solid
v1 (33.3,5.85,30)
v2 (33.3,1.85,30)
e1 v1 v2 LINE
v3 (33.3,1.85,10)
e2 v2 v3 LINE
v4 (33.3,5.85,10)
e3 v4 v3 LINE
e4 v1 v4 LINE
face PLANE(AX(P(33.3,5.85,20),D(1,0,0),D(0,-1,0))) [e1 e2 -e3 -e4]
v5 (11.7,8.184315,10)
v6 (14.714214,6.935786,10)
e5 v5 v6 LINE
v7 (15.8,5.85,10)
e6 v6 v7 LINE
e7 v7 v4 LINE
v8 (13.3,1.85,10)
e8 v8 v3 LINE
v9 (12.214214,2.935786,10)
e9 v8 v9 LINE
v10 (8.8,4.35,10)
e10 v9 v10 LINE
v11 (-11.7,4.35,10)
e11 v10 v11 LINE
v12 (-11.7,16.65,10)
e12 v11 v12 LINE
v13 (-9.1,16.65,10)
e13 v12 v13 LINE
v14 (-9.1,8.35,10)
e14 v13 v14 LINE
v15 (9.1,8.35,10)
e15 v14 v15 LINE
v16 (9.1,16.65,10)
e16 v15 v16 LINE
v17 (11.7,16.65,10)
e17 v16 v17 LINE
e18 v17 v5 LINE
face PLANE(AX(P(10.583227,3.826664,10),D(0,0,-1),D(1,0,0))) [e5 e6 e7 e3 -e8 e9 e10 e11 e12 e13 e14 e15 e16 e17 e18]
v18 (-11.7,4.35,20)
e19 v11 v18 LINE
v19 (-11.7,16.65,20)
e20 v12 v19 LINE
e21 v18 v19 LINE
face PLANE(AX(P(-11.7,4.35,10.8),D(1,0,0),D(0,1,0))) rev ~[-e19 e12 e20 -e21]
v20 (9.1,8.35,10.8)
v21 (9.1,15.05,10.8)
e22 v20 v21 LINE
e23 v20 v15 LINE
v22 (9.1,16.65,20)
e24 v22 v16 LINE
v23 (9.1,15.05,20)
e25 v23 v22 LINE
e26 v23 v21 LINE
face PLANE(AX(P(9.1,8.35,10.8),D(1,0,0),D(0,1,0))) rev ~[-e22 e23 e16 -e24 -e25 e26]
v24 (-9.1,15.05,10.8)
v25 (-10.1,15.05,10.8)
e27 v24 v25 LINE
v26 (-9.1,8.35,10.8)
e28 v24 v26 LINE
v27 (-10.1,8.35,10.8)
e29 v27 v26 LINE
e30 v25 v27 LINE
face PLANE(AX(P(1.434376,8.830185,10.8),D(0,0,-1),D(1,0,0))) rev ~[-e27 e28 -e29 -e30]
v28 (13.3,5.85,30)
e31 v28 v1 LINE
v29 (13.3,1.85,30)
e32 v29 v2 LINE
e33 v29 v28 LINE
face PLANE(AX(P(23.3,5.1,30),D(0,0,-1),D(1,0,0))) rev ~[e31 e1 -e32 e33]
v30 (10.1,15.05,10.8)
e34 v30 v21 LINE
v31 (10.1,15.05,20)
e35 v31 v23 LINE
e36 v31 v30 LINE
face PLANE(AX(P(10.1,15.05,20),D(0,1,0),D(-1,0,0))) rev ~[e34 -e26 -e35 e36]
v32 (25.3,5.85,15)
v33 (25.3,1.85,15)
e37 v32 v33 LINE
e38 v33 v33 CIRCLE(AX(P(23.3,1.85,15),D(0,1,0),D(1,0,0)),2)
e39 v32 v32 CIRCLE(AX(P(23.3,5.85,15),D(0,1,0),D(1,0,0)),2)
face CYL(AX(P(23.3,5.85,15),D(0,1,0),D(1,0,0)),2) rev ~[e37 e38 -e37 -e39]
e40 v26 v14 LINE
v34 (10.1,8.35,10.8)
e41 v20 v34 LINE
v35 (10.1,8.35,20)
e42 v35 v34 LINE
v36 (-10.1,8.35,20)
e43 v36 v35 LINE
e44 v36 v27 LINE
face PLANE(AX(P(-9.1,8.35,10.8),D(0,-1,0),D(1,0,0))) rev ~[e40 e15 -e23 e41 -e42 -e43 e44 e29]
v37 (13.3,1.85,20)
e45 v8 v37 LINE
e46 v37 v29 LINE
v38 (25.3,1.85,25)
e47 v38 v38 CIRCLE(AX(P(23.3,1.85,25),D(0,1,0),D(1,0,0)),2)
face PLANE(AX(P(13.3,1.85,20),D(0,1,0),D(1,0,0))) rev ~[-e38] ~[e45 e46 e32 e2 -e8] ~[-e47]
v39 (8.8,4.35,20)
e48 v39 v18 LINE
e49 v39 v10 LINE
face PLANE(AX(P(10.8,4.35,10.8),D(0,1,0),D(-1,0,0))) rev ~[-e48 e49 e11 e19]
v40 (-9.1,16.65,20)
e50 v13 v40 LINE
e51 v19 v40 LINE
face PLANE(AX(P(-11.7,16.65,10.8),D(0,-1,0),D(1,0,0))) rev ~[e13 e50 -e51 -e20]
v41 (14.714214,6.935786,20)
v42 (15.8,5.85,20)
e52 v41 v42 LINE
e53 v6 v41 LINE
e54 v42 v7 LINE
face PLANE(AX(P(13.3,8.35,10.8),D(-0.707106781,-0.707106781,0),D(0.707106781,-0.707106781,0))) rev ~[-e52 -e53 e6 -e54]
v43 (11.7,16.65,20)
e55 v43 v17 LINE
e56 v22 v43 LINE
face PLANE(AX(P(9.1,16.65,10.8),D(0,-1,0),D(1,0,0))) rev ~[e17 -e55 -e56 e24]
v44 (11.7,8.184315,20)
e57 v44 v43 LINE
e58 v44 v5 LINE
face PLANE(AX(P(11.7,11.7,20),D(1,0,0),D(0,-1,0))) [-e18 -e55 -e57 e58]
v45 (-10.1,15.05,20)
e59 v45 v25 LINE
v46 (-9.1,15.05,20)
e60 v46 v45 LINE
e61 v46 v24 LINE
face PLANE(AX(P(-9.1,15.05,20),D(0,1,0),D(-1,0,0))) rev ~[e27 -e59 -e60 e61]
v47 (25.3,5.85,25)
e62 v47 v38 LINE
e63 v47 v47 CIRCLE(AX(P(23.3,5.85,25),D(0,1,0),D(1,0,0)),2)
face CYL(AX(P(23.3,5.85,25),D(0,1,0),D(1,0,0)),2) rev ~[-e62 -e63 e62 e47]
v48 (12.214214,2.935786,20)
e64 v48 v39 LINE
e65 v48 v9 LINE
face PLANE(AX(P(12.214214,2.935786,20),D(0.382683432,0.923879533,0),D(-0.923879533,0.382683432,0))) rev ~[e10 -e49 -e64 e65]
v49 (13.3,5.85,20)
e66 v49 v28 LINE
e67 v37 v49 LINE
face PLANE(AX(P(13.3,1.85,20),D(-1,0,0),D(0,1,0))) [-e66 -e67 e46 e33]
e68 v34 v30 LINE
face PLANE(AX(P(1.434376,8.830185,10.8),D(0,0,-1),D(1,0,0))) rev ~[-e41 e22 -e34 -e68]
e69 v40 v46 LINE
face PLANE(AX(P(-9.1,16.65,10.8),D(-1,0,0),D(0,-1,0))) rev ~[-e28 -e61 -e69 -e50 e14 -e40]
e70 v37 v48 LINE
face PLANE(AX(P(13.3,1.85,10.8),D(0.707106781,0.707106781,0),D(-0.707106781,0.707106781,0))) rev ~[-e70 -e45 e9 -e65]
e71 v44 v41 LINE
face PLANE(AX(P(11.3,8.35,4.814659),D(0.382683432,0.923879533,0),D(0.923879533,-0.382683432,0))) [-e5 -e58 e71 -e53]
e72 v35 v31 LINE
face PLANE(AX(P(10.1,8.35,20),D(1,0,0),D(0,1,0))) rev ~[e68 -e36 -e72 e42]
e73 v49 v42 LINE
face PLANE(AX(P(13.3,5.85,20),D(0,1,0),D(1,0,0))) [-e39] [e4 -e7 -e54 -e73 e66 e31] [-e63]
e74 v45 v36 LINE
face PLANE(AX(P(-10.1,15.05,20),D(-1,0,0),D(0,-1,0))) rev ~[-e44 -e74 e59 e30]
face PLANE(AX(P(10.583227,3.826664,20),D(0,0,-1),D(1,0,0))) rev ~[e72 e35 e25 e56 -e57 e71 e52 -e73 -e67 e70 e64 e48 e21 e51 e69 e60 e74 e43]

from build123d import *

# Parameters (mm, degrees)
F0_W        = 20
F0_H        = 2.5
F1_DEPTH    = 9.2
F2_DEPTH    = 10
F3_R        = 2
F4_DEPTH    = 25
F5_W        = 1
F5_H        = 6.7
F6_DEPTH    = 0.8
F7_T1_DEPTH = 10
F7_T6_DEPTH = 20.3706815716
F8_ANGLE    = 180


# Not quite as in the source:
# - a fillet or chamfer that OpenCascade refuses, or shapes differently, is made with other operations: its cross-section is extruded or revolved along the edge and cut away or added


with BuildPart() as f1:
    # F0 (on Top) → F1 (new body)
    with BuildSketch(Plane.XY):
        Polygon((-9.1, -3.35), (-10.1, -3.35), (-10.1, 3.35), (10.1, 3.35), (10.1, -3.35), (9.1, -3.35), (9.1, -4.95), (11.7, -4.95), (11.7, 3.35), (11.7, 7.35), (10.8, 7.35), (-11.7, 7.35), (-11.7, -4.95), (-9.1, -4.95), align=None)
        Polygon((13.3, 7.35), (11.7, 7.35), (11.7, 3.35), (13.3, 3.35), (13.3, 5.85), align=None)
        Polygon((13.3, 9.85), (10.8, 7.35), (11.7, 7.35), (13.3, 7.35), align=None)
        with Locations((23.3, 8.6)):
            Rectangle(F0_W, F0_H)
        Polygon((33.3, 7.35), (13.3, 7.35), (13.3, 5.85), (15.8, 5.85), (33.3, 5.85), align=None)
        Polygon((13.3, 5.85), (13.3, 3.35), (15.8, 5.85), align=None)
    extrude(amount=F1_DEPTH)

    # F0 (on Top) → F2 (join, symmetric)
    with BuildSketch(Plane.XY):
        Polygon((33.3, 7.35), (13.3, 7.35), (13.3, 5.85), (15.8, 5.85), (33.3, 5.85), align=None)
        with Locations((23.3, 8.6)):
            Rectangle(F0_W, F0_H)
    extrude(amount=F2_DEPTH, both=True)

    # F3 (on face) → F4 (cut)
    with BuildSketch(Plane.XZ.offset(-5.85)):
        with Locations((23.3, 5)):
            Circle(F3_R)
        with Locations((23.3, -5)):
            Circle(F3_R)
    extrude(amount=-F4_DEPTH, mode=Mode.SUBTRACT)

    # F5 (on face) → F6 (join, through all)
    with BuildSketch(Plane.XY.offset(9.2)):
        Polygon((-9.1, -4.95), (-9.1, -3.35), (-10.1, -3.35), (-10.1, 3.35), (-9.1, 3.35), (9.1, 3.35), (10.1, 3.35), (10.1, -3.35), (9.1, -3.35), (9.1, -4.95), (11.7, -4.95), (11.7, 3.35), (13.3, 3.35), (15.8, 5.85), (13.3, 5.85), (13.3, 9.85), (10.8, 7.35), (-11.7, 7.35), (-11.7, -4.95), align=None)
        with Locations((-9.6, 0)):
            Rectangle(F5_W, F5_H)
        with Locations((9.6, 0)):
            Rectangle(F5_W, F5_H)
    extrude(amount=F6_DEPTH)

    # F7: chamfer of 2 on 2 edges, made by hand

    # F7_s2 → F7_t1 (join)
    with BuildSketch(Plane.XY):
        Polygon((12.2142135624, 8.7642135624), (8.8, 7.35), (10.8, 7.35), align=None)
    extrude(amount=F7_T1_DEPTH)


with BuildPart() as f7_tool4:
    # F7_s5 → F7_t6 (new body)
    with BuildSketch(Plane.XY.offset(15.1853407858)):
        Polygon((11.3, 3.35), (14.7142135624, 4.7642135624), (13.3, 3.35), align=None)
    extrude(amount=-F7_T6_DEPTH)

    split(bisect_by=Plane.YZ.offset(11.7), keep=Keep.TOP)


with BuildPart() as f1_1:
    add(f1.part)

    # F7_t3: cut F7_tool4
    add(f7_tool4.part, mode=Mode.SUBTRACT)


with BuildPart() as f1_2:
    # F8: moved
    add(f1_1.part.rotate(Axis((24.55, 5.85, 10), (1, 0, 0)), F8_ANGLE))


solid = f1_2.part
